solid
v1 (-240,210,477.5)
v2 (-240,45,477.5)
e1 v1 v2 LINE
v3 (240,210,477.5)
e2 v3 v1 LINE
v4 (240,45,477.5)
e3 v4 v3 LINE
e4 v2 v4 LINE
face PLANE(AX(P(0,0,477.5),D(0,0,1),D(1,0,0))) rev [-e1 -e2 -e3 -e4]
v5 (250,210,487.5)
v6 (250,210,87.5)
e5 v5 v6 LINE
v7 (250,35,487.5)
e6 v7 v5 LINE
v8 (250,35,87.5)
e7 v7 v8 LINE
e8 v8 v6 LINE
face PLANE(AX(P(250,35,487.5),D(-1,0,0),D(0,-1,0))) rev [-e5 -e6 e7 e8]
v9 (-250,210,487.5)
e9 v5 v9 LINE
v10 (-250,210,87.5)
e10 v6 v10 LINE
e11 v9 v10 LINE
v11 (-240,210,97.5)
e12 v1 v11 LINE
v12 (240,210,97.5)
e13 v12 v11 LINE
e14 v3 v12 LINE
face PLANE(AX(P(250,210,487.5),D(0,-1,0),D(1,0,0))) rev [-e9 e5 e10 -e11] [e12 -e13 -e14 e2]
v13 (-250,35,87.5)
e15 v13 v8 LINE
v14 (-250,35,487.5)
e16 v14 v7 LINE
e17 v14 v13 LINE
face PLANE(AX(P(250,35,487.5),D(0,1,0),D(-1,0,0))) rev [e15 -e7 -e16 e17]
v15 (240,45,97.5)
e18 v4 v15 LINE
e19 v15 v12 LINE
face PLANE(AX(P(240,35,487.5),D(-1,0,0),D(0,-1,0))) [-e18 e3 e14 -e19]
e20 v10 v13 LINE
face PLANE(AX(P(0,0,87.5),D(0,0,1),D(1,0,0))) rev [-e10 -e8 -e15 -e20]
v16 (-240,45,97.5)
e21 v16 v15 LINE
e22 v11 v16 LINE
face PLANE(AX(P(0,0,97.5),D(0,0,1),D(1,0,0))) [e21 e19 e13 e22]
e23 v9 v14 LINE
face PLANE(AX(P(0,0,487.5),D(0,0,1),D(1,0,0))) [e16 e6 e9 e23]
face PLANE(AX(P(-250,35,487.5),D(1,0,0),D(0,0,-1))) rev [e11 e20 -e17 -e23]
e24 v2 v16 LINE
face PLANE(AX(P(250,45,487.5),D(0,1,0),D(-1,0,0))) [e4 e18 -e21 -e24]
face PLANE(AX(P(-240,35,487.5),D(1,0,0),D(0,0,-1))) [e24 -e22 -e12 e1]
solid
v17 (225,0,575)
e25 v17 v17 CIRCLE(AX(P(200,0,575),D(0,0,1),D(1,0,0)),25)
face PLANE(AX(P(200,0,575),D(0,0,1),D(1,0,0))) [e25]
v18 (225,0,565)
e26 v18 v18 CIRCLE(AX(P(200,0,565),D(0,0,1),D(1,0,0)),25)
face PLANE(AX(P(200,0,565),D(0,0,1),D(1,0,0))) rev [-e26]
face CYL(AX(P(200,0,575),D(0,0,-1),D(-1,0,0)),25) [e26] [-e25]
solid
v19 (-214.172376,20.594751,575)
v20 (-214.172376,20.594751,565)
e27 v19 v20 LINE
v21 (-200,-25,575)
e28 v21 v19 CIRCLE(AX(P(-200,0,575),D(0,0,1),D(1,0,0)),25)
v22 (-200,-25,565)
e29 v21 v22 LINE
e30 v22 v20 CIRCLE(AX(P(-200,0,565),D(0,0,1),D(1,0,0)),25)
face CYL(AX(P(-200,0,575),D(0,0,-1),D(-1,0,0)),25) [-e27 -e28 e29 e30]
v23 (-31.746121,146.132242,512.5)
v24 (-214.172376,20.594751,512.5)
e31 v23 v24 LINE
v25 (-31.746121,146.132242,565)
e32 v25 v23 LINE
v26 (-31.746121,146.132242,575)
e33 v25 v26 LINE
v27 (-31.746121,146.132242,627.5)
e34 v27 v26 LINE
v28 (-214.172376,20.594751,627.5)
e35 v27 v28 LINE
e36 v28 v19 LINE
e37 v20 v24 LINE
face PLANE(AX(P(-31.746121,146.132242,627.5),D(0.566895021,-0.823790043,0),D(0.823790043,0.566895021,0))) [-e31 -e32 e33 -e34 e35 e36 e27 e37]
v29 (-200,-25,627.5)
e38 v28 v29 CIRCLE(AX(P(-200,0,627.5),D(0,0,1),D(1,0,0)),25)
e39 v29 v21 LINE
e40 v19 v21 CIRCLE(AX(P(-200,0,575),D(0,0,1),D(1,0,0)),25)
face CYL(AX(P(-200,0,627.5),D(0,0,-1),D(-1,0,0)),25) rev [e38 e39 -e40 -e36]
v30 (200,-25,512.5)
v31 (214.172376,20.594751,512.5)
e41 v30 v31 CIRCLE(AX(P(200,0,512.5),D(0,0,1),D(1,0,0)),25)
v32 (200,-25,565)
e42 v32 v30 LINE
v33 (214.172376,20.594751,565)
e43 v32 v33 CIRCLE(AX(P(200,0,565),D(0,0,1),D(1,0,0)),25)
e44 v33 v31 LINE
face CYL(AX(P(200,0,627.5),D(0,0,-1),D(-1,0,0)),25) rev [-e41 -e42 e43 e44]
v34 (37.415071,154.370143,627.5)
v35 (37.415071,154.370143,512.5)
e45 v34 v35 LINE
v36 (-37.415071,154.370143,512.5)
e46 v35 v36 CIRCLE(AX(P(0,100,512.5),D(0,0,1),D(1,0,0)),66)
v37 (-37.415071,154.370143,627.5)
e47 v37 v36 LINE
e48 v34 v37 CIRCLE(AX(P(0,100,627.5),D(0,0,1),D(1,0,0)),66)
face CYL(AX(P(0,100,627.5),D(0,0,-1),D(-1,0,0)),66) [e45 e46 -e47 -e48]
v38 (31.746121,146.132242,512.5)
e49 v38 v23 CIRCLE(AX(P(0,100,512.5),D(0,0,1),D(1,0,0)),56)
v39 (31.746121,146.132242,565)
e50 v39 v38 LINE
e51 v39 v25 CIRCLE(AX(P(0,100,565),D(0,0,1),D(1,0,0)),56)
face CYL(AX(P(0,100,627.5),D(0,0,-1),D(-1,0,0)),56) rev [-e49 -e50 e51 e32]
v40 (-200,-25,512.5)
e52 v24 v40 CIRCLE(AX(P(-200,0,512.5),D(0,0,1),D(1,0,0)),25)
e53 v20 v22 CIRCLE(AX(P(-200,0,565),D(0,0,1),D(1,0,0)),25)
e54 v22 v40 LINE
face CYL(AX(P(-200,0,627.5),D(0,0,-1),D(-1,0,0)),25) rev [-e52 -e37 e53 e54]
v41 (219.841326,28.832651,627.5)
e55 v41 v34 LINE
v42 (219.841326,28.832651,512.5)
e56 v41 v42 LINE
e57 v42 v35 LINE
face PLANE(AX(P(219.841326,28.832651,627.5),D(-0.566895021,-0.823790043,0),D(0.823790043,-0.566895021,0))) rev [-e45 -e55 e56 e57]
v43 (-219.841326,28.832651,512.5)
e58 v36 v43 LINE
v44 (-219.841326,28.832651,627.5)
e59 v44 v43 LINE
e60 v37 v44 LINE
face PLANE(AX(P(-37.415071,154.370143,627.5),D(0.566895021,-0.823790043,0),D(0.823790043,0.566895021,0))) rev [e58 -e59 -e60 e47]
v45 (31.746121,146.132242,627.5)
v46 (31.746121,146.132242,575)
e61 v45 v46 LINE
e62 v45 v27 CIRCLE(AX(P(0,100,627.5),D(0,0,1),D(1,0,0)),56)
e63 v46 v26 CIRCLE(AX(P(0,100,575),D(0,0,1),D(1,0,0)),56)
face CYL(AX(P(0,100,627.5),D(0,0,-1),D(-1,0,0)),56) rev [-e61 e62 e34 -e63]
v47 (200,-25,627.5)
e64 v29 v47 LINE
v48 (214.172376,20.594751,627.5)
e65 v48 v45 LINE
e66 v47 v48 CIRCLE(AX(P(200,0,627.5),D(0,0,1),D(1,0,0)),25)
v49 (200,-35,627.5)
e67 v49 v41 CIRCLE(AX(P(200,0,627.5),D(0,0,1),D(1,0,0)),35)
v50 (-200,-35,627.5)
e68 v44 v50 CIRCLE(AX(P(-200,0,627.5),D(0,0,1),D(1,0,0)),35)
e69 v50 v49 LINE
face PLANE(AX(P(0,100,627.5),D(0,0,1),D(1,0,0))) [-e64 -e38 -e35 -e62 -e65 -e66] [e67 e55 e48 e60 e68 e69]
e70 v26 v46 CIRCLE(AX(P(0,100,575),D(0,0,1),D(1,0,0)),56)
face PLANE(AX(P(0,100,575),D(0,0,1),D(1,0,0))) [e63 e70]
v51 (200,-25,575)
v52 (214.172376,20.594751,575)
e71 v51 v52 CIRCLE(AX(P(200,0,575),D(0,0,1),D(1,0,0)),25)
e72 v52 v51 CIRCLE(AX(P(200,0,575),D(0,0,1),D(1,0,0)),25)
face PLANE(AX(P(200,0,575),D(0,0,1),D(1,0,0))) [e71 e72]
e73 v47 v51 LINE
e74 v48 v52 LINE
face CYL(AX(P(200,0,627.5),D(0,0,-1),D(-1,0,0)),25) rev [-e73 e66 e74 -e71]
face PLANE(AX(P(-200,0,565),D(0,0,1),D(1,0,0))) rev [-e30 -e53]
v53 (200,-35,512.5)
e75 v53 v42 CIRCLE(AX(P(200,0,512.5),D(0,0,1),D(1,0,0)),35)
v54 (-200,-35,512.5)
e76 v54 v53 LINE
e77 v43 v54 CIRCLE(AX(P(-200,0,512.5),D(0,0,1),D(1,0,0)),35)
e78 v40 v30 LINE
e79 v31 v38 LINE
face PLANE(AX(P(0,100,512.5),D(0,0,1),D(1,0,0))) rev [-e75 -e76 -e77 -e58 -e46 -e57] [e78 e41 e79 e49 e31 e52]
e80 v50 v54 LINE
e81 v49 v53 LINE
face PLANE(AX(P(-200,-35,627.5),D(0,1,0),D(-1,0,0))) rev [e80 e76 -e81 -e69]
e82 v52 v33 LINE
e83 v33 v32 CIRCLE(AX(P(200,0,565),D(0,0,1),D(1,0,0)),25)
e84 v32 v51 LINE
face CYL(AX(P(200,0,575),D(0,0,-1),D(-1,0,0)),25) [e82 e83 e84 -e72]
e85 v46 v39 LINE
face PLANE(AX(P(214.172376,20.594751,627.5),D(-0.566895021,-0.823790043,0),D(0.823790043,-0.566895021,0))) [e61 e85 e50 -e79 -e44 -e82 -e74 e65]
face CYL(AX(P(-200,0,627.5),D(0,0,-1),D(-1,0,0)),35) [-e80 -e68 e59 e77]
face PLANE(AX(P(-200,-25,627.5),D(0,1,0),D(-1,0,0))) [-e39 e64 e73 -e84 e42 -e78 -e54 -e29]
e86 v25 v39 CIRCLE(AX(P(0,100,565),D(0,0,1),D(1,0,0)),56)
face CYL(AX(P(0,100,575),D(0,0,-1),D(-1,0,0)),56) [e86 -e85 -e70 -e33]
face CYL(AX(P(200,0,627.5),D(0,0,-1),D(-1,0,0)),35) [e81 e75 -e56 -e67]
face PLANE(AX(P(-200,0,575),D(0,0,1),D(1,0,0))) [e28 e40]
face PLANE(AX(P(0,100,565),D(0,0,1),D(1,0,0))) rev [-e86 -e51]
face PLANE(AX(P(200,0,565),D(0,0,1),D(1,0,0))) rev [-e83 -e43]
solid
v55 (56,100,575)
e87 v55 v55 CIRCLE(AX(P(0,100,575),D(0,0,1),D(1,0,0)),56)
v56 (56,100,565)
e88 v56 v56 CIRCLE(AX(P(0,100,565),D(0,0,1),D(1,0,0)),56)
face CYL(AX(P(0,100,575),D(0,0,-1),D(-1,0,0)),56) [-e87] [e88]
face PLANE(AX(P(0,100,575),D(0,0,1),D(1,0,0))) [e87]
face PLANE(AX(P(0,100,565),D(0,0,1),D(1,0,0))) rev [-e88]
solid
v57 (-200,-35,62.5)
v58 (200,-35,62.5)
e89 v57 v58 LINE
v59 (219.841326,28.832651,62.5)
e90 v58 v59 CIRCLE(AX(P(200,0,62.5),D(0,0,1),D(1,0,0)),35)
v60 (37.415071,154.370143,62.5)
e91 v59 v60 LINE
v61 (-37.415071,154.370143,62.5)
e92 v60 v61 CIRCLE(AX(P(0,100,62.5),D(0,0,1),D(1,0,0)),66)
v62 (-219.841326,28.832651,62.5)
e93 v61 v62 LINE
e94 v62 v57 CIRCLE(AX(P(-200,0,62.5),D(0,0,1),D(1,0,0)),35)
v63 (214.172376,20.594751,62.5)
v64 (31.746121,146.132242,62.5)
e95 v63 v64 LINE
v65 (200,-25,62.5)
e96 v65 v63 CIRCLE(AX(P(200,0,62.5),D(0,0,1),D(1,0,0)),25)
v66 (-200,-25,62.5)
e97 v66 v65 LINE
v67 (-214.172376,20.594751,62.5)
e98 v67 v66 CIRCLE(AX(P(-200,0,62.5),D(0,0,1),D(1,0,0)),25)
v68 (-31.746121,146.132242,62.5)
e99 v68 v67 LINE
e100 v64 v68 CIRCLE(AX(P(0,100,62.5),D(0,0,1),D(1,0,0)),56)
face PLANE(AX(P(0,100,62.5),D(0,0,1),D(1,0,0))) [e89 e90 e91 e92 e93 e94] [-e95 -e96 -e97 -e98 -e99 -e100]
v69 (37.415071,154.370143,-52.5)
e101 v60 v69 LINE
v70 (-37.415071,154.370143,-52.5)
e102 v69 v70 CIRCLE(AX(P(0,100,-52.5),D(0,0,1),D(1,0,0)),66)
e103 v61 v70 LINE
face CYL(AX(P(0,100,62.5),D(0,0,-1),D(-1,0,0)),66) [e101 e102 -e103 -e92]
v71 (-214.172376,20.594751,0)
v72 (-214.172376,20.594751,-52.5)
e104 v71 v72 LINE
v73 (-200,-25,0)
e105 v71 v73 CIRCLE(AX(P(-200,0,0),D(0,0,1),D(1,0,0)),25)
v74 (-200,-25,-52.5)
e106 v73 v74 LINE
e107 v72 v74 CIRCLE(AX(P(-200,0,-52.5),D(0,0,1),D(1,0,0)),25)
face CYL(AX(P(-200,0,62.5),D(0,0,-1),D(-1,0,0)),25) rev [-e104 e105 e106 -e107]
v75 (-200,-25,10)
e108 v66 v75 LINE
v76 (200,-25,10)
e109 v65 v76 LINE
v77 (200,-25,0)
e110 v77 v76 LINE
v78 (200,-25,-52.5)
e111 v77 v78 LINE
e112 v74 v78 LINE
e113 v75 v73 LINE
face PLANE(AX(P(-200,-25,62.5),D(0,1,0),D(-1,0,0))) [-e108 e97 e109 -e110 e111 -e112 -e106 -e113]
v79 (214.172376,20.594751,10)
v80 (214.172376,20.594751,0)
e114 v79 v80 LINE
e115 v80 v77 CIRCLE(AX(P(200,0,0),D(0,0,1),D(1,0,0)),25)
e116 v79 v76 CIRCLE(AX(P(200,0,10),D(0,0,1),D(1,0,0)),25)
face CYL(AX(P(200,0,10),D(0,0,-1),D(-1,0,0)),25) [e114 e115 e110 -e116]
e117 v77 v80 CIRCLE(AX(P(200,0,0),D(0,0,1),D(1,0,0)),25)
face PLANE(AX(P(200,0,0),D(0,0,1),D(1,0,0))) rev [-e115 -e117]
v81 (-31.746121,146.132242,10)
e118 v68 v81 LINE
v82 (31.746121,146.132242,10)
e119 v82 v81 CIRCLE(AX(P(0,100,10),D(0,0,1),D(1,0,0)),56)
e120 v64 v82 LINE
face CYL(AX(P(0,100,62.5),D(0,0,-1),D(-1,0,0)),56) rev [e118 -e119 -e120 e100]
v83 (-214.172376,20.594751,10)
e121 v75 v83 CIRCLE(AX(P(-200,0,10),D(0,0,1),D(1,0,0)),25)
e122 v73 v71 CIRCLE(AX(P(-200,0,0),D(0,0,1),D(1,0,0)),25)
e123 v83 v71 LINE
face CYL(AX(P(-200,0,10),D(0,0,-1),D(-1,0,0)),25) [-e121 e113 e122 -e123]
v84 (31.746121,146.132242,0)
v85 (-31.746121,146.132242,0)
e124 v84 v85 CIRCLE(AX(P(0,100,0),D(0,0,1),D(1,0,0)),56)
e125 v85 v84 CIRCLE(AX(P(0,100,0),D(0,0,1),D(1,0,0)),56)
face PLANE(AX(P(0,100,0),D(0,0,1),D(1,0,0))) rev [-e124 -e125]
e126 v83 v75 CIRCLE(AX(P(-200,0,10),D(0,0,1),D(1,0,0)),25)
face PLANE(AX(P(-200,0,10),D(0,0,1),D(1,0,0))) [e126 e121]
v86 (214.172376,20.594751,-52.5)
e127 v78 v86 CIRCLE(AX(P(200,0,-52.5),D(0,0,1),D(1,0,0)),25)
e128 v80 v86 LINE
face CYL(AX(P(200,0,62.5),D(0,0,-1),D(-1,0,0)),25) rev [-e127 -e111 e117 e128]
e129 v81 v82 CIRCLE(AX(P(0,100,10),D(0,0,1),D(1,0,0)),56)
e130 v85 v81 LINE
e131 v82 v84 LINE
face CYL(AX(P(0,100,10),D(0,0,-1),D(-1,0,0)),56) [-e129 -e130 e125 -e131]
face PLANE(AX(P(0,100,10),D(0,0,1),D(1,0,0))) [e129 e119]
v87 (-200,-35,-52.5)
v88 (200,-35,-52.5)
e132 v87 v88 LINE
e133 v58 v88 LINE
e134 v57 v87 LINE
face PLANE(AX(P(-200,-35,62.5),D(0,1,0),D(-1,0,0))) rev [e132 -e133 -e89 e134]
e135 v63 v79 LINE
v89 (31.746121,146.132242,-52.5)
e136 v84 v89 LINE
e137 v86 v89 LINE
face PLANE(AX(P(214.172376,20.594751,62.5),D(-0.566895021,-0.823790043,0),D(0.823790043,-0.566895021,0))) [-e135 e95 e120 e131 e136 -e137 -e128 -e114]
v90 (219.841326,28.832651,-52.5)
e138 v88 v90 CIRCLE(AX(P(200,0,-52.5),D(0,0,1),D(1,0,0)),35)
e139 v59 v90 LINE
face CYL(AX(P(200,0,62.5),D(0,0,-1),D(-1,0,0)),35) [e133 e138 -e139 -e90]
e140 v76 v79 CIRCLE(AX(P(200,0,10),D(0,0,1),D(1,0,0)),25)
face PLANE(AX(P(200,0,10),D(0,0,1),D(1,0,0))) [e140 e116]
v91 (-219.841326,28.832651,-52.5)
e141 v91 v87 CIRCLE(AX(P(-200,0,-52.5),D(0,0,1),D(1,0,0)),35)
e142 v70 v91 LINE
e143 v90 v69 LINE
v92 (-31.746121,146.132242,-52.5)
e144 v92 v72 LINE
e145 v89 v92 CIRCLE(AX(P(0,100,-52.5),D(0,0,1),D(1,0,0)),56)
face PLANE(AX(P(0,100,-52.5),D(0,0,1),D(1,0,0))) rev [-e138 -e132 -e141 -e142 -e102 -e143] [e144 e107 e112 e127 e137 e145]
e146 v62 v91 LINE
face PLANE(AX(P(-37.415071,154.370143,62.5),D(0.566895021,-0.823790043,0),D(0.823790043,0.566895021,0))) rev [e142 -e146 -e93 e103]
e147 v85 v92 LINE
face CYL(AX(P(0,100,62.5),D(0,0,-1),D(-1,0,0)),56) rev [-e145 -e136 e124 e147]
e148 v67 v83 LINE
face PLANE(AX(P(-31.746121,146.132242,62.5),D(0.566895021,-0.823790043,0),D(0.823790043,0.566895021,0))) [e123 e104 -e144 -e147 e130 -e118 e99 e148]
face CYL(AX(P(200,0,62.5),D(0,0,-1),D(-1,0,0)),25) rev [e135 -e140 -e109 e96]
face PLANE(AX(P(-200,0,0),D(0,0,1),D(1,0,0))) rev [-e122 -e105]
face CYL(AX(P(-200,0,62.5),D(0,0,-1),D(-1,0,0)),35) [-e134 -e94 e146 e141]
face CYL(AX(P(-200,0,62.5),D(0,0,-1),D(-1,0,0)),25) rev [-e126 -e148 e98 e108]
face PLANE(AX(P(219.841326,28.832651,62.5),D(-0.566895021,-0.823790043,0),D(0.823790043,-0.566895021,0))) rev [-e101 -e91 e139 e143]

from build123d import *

# Parameters (mm, degrees)
SCHIZZO1_R                     = 25
ESTRUSIONE_ESTRUSIONE1_DEPTH   = 10
ESTRUSIONE_ESTRUSIONE1_2_DEPTH = 10
SCHIZZO1_R_2                   = 56
ESTRUSIONE_ESTRUSIONE1_3_DEPTH = 10
ESTRUSIONE_SOTTILE1_START      = -62.5
ESTRUSIONE_SOTTILE1_DEPTH      = 115
SCHIZZO3_W                     = 500
SCHIZZO3_H                     = 175
ESTRUSIONE_ESTRUSIONE2_DEPTH   = 400
RIPETIZIONE_START              = 565
RIPETIZIONE_A_L1_OUTLINE_R     = 56
RIPETIZIONE_A_L1_DEPTH         = 10
RIPETIZIONE_A_L1_2_OUTLINE_R   = 25
RIPETIZIONE_A_L1_2_DEPTH       = 10
RIPETIZIONE_START_2            = 512.5
RIPETIZIONE_A_L1_3_DEPTH       = 115
RIPETIZIONE_A_L1_4_DEPTH       = 10
SVUOTA1_T                      = -10


# Read off the part's stored shape, not the designer's step: Ripetizione a L1
with BuildPart() as part:
    # Schizzo1 → Estrusione-Estrusione1 (new body)
    with BuildSketch(Plane.XY):
        with Locations((-200, 0)):
            Circle(SCHIZZO1_R)
    extrude(amount=ESTRUSIONE_ESTRUSIONE1_DEPTH)



with BuildPart() as body_2:
    # Schizzo1 → Estrusione-Estrusione1 2 (new body)
    with BuildSketch(Plane.XY):
        with Locations((200, 0)):
            Circle(SCHIZZO1_R)
    extrude(amount=ESTRUSIONE_ESTRUSIONE1_2_DEPTH)


with BuildPart() as body_3:
    # Schizzo1 → Estrusione-Estrusione1 3 (new body)
    with BuildSketch(Plane.XY):
        with Locations((0, 100)):
            Circle(SCHIZZO1_R_2)
    extrude(amount=ESTRUSIONE_ESTRUSIONE1_3_DEPTH)


with BuildPart() as part_1:
    add(part.part)

    add(body_2.part)  # Estrusione-Sottile1 merges body 2

    add(body_3.part)  # Estrusione-Sottile1 merges body 3
    # Schizzo2 → Estrusione-Sottile1 (add)
    with BuildSketch(Plane.XY.offset(10).offset(ESTRUSIONE_SOTTILE1_START)):
        with BuildLine():
            Line((219.84132575, 28.8326515), (37.415071414, 154.370142828))
            ThreePointArc((37.415071414, 154.370142828), (0, 166), (-37.415071414, 154.370142828))
            Line((-37.415071414, 154.370142828), (-219.84132575, 28.8326515))
            ThreePointArc((-219.84132575, 28.8326515), (-233.422618109, -10.388868984), (-200, -35))
            Line((-200, -35), (200, -35))
            ThreePointArc((200, -35), (233.422618109, -10.388868984), (219.84132575, 28.8326515))
        make_face()
        with BuildLine():
            Line((214.172375536, 20.594751071), (31.7461212, 146.132242399))
            ThreePointArc((31.7461212, 146.132242399), (0, 156), (-31.7461212, 146.132242399))
            Line((-31.7461212, 146.132242399), (-214.172375536, 20.594751071))
            ThreePointArc((-214.172375536, 20.594751071), (-223.873298649, -7.420620703), (-200, -25))
            Line((-200, -25), (200, -25))
            ThreePointArc((200, -25), (223.873298649, -7.420620703), (214.172375536, 20.594751071))
        make_face(mode=Mode.SUBTRACT)
    extrude(amount=ESTRUSIONE_SOTTILE1_DEPTH)


with BuildPart() as body_2_2:
    # Schizzo3 → Estrusione-Estrusione2 (new body)
    with BuildSketch(Plane.XY.offset(87.5)):
        with Locations((0, 122.5)):
            Rectangle(SCHIZZO3_W, SCHIZZO3_H)
    extrude(amount=ESTRUSIONE_ESTRUSIONE2_DEPTH)

    # Svuota1
    svuota1_openings = [body_2_2.faces().sort_by_distance(p)[0] for p in [
        (0, 210, 287.5),
    ]]
    offset(amount=SVUOTA1_T, openings=svuota1_openings, kind=Kind.INTERSECTION)


with BuildPart() as body_3_2:
    # Ripetizione a L1 outline → Ripetizione a L1 (new body)
    with BuildSketch(Plane.XY.offset(RIPETIZIONE_START)):
        with Locations((0, 100)):
            Circle(RIPETIZIONE_A_L1_OUTLINE_R)
    extrude(amount=RIPETIZIONE_A_L1_DEPTH)


with BuildPart() as body_4:
    # Ripetizione a L1 2 outline → Ripetizione a L1 2 (new body)
    with BuildSketch(Plane.XY.offset(RIPETIZIONE_START)):
        with Locations((200, 0)):
            Circle(RIPETIZIONE_A_L1_2_OUTLINE_R)
    extrude(amount=RIPETIZIONE_A_L1_2_DEPTH)


with BuildPart() as body_5:
    # Ripetizione a L1 3 outline → Ripetizione a L1 3 (new body)
    with BuildSketch(Plane.XY.offset(RIPETIZIONE_START_2)):
        with BuildLine():
            ThreePointArc((37.415071414, 154.370142828), (0, 166), (-37.415071414, 154.370142828))
            Line((-37.415071414, 154.370142828), (-219.84132575, 28.8326515))
            ThreePointArc((-219.84132575, 28.8326515), (-233.422618109, -10.388868983), (-200, -35))
            Line((-200, -35), (200, -35))
            ThreePointArc((200, -35), (233.422618109, -10.388868983), (219.84132575, 28.8326515))
            Line((219.84132575, 28.8326515), (37.415071414, 154.370142828))
        make_face()
        with BuildLine():
            Line((-214.172375536, 20.594751071), (-31.7461212, 146.132242399))
            ThreePointArc((-31.7461212, 146.132242399), (0, 156), (31.7461212, 146.132242399))
            Line((31.7461212, 146.132242399), (214.172375536, 20.594751071))
            ThreePointArc((214.172375536, 20.594751071), (223.873298649, -7.420620703), (200, -25))
            Line((200, -25), (-200, -25))
            ThreePointArc((-200, -25), (-223.873298649, -7.420620703), (-214.172375536, 20.594751071))
        make_face(mode=Mode.SUBTRACT)
    extrude(amount=RIPETIZIONE_A_L1_3_DEPTH)

    # Ripetizione a L1 4 outline → Ripetizione a L1 4 (add)
    with BuildSketch(Plane.XY.offset(RIPETIZIONE_START)):
        with BuildLine():
            ThreePointArc((31.7461212, 146.132242399), (0, 156), (-31.7461212, 146.132242399))
            ThreePointArc((-31.7461212, 146.132242399), (0, 44), (31.7461212, 146.132242399))
        make_face()
        with BuildLine():
            ThreePointArc((-200, -25), (-176.126701351, 7.420620703), (-214.172375536, 20.594751071))
            ThreePointArc((-214.172375536, 20.594751071), (-223.873298649, -7.420620703), (-200, -25))
        make_face()
        with BuildLine():
            ThreePointArc((200, -25), (223.873298649, -7.420620703), (214.172375536, 20.594751071))
            ThreePointArc((214.172375536, 20.594751071), (176.126701351, 7.420620703), (200, -25))
        make_face()
    extrude(amount=RIPETIZIONE_A_L1_4_DEPTH)


solid = Compound([part_1.part, body_2_2.part, body_3_2.part, body_4.part, body_5.part])
